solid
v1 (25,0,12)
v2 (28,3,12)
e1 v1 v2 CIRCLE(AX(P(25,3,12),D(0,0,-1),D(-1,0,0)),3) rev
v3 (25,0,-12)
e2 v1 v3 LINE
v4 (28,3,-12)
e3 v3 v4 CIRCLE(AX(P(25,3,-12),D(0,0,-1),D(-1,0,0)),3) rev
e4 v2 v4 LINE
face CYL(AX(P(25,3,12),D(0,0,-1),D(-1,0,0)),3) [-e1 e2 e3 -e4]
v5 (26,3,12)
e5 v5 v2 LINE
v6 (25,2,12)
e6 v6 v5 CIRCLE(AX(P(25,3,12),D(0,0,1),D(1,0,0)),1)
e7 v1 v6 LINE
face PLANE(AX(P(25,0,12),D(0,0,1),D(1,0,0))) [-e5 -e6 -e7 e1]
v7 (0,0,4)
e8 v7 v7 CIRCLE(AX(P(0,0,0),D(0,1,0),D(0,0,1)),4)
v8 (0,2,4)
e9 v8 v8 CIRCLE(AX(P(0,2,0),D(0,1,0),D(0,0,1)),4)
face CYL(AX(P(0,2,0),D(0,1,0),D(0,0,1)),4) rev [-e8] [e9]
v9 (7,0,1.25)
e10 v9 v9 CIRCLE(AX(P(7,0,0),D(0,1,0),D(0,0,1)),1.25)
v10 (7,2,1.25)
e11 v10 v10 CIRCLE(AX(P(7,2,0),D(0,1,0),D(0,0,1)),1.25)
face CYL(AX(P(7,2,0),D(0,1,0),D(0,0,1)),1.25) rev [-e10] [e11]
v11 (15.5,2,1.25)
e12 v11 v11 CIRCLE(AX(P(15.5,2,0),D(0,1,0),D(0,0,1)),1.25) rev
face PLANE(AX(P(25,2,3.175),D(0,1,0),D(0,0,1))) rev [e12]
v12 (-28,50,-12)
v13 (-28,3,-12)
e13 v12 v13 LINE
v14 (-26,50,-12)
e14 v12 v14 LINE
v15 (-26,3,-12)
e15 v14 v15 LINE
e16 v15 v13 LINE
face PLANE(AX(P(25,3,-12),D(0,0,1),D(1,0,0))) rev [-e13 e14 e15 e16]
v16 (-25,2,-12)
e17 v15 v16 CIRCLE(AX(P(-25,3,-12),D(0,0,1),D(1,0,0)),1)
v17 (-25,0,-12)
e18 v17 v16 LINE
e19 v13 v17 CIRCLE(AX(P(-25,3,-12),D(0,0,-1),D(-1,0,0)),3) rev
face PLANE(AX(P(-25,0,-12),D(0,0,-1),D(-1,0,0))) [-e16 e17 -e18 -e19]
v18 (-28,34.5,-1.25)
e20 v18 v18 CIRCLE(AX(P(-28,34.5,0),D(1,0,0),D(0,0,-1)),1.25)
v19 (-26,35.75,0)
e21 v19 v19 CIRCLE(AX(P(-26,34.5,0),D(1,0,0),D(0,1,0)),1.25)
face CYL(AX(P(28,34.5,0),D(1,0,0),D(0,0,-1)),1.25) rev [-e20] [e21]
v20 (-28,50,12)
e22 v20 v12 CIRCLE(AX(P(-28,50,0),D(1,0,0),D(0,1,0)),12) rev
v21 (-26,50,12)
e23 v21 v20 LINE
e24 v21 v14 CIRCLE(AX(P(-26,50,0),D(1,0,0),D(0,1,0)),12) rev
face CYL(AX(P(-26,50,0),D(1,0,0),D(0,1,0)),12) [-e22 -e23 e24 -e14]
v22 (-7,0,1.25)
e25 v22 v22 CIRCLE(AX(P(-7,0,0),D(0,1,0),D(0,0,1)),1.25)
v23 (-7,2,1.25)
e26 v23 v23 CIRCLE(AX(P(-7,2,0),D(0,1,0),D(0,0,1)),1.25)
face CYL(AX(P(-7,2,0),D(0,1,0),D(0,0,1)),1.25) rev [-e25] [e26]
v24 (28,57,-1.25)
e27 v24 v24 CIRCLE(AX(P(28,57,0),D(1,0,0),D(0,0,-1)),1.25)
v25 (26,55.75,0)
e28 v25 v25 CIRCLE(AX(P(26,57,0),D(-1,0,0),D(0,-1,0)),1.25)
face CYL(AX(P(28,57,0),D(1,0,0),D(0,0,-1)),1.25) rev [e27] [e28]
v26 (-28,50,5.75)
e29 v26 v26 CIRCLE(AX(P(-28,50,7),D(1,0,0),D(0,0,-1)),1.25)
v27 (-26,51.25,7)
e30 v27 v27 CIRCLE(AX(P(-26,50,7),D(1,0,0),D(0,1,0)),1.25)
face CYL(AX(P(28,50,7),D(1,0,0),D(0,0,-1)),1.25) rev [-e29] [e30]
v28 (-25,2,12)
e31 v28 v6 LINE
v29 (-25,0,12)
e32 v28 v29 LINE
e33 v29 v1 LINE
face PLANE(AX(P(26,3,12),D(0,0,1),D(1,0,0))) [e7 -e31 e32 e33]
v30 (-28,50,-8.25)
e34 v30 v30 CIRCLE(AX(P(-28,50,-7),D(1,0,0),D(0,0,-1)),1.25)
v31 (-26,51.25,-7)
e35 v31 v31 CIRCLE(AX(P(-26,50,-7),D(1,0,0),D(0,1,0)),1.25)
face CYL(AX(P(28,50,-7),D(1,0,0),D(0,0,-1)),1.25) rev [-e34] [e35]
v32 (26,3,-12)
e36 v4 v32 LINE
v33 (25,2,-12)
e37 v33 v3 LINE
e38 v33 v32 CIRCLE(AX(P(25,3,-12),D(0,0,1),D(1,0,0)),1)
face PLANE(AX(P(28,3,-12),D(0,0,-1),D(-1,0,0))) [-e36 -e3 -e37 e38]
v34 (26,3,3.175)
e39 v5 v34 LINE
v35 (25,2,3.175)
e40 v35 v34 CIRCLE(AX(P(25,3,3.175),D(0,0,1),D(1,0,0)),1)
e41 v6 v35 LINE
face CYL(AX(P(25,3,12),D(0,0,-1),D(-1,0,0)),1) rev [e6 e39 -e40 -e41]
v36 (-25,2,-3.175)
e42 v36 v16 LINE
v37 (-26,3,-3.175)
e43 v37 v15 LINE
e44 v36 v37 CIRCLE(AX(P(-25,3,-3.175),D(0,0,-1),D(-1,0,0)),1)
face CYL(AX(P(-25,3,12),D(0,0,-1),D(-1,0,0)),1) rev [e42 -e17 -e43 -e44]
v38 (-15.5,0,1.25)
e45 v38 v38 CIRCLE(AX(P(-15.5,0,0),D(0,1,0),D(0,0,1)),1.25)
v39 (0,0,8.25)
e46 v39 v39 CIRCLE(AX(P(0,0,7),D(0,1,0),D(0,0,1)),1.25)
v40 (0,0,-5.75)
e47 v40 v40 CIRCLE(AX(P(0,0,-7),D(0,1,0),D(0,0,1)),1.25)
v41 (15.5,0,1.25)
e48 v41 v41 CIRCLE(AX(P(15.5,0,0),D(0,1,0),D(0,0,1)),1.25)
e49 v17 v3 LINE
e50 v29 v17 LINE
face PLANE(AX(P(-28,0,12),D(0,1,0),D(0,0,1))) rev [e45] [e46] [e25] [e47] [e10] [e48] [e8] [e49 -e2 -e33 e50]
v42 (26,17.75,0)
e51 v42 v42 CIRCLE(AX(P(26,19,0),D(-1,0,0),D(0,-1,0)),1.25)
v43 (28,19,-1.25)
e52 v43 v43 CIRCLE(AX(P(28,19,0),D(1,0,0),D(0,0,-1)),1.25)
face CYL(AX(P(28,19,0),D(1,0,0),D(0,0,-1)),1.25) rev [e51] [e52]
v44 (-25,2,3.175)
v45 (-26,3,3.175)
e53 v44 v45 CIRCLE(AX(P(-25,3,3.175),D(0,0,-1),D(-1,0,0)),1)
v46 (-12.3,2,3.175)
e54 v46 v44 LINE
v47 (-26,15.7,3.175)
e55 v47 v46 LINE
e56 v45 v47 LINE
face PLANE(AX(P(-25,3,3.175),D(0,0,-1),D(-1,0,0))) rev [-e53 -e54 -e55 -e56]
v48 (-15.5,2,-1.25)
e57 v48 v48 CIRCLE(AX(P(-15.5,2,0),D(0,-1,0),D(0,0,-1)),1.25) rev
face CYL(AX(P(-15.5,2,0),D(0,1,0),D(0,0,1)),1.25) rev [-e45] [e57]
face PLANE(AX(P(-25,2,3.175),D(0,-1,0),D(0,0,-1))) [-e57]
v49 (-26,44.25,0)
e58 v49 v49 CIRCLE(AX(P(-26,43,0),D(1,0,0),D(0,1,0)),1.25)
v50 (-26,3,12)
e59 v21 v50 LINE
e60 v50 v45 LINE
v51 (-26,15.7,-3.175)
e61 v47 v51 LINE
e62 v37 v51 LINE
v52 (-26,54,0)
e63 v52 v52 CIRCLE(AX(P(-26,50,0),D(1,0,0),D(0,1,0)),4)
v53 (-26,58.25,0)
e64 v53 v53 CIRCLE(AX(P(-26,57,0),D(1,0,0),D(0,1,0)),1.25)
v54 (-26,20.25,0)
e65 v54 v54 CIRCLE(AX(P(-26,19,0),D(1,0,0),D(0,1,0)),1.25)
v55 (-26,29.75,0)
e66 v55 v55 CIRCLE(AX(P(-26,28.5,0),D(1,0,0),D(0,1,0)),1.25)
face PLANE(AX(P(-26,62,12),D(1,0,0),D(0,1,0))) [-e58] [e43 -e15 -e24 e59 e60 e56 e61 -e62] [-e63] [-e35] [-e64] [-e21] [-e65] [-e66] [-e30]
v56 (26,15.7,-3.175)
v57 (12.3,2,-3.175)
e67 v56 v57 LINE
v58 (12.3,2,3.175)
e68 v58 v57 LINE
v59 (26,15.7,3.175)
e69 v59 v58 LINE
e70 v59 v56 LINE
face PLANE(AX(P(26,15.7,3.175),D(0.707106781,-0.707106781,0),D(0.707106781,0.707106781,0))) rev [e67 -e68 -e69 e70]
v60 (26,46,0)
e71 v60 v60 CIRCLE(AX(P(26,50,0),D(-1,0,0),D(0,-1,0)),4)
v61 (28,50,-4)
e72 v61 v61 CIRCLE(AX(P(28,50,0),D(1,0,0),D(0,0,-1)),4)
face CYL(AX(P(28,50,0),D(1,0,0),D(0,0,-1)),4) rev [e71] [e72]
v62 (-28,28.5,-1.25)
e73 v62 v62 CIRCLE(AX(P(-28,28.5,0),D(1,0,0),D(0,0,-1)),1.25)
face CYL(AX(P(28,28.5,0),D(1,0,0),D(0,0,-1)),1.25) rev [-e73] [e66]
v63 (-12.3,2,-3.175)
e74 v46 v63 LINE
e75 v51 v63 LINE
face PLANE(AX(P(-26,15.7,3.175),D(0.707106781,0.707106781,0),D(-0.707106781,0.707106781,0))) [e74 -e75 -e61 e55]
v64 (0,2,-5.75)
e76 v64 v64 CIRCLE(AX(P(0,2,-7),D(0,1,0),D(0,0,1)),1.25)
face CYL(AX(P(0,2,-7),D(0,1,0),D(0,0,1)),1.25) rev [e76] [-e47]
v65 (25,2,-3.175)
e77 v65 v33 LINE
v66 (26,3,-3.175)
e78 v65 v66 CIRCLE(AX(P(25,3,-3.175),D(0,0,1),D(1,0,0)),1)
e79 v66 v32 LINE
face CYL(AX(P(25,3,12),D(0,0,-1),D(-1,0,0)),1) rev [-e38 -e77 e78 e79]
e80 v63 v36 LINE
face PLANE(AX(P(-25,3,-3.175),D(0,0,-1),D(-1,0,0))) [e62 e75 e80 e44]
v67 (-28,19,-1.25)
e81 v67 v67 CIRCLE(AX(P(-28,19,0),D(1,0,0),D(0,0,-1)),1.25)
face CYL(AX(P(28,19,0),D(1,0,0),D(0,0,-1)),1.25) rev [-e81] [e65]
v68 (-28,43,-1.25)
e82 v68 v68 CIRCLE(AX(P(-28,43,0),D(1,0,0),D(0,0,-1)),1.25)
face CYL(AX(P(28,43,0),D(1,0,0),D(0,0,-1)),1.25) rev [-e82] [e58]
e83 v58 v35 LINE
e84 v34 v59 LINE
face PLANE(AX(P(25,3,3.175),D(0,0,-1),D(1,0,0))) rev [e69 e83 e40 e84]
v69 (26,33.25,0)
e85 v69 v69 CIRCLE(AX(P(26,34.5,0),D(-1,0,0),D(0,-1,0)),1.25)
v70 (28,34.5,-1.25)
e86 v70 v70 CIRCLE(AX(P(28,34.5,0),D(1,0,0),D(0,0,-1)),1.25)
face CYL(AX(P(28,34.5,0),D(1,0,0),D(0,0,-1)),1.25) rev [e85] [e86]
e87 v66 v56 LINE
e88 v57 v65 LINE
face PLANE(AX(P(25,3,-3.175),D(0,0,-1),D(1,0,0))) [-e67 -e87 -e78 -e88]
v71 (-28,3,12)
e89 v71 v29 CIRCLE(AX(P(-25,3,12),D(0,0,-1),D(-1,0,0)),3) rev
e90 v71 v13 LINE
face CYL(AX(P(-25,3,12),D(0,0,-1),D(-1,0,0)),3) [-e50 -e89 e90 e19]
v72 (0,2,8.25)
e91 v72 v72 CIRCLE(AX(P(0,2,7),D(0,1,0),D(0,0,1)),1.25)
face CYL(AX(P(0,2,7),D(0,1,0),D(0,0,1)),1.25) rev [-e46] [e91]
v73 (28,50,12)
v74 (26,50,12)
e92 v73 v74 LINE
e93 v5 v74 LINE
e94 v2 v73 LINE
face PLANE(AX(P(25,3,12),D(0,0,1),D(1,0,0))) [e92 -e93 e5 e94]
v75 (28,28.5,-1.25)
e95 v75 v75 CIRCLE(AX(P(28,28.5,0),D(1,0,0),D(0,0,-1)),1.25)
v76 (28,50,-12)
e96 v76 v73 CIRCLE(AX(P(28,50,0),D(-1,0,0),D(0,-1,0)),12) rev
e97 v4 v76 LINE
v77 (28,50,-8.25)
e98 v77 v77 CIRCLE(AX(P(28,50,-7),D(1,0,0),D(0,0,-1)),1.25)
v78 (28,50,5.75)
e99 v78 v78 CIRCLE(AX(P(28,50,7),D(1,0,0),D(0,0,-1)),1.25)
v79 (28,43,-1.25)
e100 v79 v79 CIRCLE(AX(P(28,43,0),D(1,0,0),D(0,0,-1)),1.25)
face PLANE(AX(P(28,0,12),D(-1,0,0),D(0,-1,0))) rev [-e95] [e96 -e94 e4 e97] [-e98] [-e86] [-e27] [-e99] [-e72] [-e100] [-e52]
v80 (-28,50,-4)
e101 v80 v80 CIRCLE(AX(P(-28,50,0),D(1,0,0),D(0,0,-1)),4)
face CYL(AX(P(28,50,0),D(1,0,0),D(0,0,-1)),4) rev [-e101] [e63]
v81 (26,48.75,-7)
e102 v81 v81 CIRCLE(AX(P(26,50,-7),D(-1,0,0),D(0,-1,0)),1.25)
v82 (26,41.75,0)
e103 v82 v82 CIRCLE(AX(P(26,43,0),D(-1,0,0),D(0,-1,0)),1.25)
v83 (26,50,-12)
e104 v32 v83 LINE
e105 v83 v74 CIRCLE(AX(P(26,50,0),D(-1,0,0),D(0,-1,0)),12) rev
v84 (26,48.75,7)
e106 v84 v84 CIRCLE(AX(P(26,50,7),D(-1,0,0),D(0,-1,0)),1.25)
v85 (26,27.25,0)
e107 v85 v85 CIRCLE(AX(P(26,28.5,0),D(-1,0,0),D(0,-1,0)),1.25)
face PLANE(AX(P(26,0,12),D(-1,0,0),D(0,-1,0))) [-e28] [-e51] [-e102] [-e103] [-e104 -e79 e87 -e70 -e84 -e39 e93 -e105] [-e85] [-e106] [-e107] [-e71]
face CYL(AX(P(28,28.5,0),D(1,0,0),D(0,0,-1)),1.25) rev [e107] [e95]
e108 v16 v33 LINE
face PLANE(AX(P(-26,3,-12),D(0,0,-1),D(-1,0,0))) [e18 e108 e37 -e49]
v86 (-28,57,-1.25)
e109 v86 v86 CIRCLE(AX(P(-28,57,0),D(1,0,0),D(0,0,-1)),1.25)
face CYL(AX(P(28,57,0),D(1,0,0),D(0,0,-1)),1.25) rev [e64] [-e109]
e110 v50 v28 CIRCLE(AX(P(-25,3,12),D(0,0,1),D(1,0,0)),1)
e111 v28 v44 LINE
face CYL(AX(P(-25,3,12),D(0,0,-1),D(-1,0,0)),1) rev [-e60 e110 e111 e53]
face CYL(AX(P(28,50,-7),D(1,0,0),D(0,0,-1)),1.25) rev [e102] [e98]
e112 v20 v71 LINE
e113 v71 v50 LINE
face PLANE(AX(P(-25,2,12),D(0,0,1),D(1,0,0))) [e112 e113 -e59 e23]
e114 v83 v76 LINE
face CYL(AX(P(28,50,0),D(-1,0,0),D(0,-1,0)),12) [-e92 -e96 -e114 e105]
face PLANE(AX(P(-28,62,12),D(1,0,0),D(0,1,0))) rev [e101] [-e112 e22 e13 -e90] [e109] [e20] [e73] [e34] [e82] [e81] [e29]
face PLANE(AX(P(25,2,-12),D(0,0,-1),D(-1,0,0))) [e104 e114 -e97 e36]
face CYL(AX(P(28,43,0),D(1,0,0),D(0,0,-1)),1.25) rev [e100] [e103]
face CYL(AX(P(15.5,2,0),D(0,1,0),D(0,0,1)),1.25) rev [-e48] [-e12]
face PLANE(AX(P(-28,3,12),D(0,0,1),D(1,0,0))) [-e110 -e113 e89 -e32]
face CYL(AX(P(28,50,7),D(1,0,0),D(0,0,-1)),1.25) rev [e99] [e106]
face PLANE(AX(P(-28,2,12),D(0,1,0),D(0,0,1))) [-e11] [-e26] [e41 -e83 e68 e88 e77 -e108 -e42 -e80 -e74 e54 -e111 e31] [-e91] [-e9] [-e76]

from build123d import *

# Parameters (mm, degrees)
T_LE_DE_BASE_PLI_E1_DEPTH       = 12
ENL_V_START                     = -56
ENL_V_MAT_EXTRU_1_DEPTH         = 56
DIAM_TRE_DU_PER_AGE_8_0_8_1_D   = 8
DIAM_TRE_DU_PER_AGE_2_5_2_5_1_D = 2.5
DIAM_TRE_DU_PER_AGE_8_0_8_2_D   = 8
DIAM_TRE_DU_PER_AGE_2_5_2_5_2_D = 2.5
BOSS_EXTRUDE1_DEPTH             = 3.175


# Read off the part's stored shape, not the designer's step: Enlèv. mat.-Extru.1
# Sheet-metal steps are written as plain solids
with BuildPart() as part:
    # Esquisse1 → Tôle de base pliée1 (new, symmetric)
    with BuildSketch(Plane.XY):
        with BuildLine():
            Line((-28, 62), (-28, 3))
            ThreePointArc((-28, 3), (-27.121320344, 0.878679656), (-25, 0))
            Line((-25, 0), (25, 0))
            ThreePointArc((25, 0), (27.121320344, 0.878679656), (28, 3))
            Line((28, 3), (28, 62))
            Line((28, 62), (26, 62))
            Line((26, 62), (26, 3))
            ThreePointArc((26, 3), (25.707106781, 2.292893219), (25, 2))
            Line((25, 2), (-25, 2))
            ThreePointArc((-25, 2), (-25.707106781, 2.292893219), (-26, 3))
            Line((-26, 3), (-26, 62))
            Line((-26, 62), (-28, 62))
        make_face()
    extrude(amount=T_LE_DE_BASE_PLI_E1_DEPTH, both=True)

    # Enlèv. mat.-Extru.1 outline → Enlèv. mat.-Extru.1 (cut)
    with BuildSketch(Plane(origin=(28, 0, 0), x_dir=(0, 0, -1), z_dir=(1, 0, 0)).offset(ENL_V_START)):
        with BuildLine():
            ThreePointArc((-12, 50), (-8.485281374, 58.485281374), (0, 62))
            Line((0, 62), (-12, 62))
            Line((-12, 62), (-12, 50))
        make_face()
        with BuildLine():
            ThreePointArc((0, 62), (8.485281374, 58.485281374), (12, 50))
            Line((12, 50), (12, 62))
            Line((12, 62), (0, 62))
        make_face()
    extrude(amount=ENL_V_MAT_EXTRU_1_DEPTH, mode=Mode.SUBTRACT)

    # Diamètre du perçage Ø8.0 (8)1 (through all)
    with Locations(Plane(origin=(28, 0, 0), x_dir=(0, 0, -1), z_dir=(1, 0, 0))):
        with Locations((0, 50)):
            Hole(DIAM_TRE_DU_PER_AGE_8_0_8_1_D / 2)

    # Diamètre du perçage Ø2.5 (2.5)1 (through all)
    with Locations(Plane(origin=(28, 0, 0), x_dir=(0, 0, -1), z_dir=(1, 0, 0))):
        with Locations((0, 57), (7, 50), (0, 43), (-7, 50), (0, 34.5), (0, 28.5), (0, 19)):
            Hole(DIAM_TRE_DU_PER_AGE_2_5_2_5_1_D / 2)

    # Diamètre du perçage Ø8.0 (8)2 (through all)
    with Locations(Plane(origin=(0, 2, 0), x_dir=(1, 0, 0), z_dir=(0, 1, 0))):
        with Locations((0, 0)):
            Hole(DIAM_TRE_DU_PER_AGE_8_0_8_2_D / 2)

    # Diamètre du perçage Ø2.5 (2.5)2 (through all)
    with Locations(Plane(origin=(0, 2, 0), x_dir=(1, 0, 0), z_dir=(0, 1, 0))):
        with Locations((0, 7), (7, 0), (0, -7), (-7, 0), (-15.5, 0), (15.5, 0)):
            Hole(DIAM_TRE_DU_PER_AGE_2_5_2_5_2_D / 2)

    # Sketch1 → Boss-Extrude1 (add, symmetric)
    with BuildSketch(Plane(origin=(0, 0, 0), x_dir=(-1, 0, 0), z_dir=(0, 0, -1))):
        with BuildLine():
            Line((26, 15.7), (12.3, 2))
            Line((12.3, 2), (25, 2))
            ThreePointArc((25, 2), (25.707106781, 2.292893219), (26, 3))
            Line((26, 3), (26, 15.7))
        make_face()
    boss_extrude1 = extrude(amount=BOSS_EXTRUDE1_DEPTH, both=True)

    # Mirror1: Boss-Extrude1 across plane
    add(boss_extrude1.mirror(Plane(origin=(0, 0, 0), x_dir=(0, 0, 1), z_dir=(1, 0, 0))))


solid = part.part
